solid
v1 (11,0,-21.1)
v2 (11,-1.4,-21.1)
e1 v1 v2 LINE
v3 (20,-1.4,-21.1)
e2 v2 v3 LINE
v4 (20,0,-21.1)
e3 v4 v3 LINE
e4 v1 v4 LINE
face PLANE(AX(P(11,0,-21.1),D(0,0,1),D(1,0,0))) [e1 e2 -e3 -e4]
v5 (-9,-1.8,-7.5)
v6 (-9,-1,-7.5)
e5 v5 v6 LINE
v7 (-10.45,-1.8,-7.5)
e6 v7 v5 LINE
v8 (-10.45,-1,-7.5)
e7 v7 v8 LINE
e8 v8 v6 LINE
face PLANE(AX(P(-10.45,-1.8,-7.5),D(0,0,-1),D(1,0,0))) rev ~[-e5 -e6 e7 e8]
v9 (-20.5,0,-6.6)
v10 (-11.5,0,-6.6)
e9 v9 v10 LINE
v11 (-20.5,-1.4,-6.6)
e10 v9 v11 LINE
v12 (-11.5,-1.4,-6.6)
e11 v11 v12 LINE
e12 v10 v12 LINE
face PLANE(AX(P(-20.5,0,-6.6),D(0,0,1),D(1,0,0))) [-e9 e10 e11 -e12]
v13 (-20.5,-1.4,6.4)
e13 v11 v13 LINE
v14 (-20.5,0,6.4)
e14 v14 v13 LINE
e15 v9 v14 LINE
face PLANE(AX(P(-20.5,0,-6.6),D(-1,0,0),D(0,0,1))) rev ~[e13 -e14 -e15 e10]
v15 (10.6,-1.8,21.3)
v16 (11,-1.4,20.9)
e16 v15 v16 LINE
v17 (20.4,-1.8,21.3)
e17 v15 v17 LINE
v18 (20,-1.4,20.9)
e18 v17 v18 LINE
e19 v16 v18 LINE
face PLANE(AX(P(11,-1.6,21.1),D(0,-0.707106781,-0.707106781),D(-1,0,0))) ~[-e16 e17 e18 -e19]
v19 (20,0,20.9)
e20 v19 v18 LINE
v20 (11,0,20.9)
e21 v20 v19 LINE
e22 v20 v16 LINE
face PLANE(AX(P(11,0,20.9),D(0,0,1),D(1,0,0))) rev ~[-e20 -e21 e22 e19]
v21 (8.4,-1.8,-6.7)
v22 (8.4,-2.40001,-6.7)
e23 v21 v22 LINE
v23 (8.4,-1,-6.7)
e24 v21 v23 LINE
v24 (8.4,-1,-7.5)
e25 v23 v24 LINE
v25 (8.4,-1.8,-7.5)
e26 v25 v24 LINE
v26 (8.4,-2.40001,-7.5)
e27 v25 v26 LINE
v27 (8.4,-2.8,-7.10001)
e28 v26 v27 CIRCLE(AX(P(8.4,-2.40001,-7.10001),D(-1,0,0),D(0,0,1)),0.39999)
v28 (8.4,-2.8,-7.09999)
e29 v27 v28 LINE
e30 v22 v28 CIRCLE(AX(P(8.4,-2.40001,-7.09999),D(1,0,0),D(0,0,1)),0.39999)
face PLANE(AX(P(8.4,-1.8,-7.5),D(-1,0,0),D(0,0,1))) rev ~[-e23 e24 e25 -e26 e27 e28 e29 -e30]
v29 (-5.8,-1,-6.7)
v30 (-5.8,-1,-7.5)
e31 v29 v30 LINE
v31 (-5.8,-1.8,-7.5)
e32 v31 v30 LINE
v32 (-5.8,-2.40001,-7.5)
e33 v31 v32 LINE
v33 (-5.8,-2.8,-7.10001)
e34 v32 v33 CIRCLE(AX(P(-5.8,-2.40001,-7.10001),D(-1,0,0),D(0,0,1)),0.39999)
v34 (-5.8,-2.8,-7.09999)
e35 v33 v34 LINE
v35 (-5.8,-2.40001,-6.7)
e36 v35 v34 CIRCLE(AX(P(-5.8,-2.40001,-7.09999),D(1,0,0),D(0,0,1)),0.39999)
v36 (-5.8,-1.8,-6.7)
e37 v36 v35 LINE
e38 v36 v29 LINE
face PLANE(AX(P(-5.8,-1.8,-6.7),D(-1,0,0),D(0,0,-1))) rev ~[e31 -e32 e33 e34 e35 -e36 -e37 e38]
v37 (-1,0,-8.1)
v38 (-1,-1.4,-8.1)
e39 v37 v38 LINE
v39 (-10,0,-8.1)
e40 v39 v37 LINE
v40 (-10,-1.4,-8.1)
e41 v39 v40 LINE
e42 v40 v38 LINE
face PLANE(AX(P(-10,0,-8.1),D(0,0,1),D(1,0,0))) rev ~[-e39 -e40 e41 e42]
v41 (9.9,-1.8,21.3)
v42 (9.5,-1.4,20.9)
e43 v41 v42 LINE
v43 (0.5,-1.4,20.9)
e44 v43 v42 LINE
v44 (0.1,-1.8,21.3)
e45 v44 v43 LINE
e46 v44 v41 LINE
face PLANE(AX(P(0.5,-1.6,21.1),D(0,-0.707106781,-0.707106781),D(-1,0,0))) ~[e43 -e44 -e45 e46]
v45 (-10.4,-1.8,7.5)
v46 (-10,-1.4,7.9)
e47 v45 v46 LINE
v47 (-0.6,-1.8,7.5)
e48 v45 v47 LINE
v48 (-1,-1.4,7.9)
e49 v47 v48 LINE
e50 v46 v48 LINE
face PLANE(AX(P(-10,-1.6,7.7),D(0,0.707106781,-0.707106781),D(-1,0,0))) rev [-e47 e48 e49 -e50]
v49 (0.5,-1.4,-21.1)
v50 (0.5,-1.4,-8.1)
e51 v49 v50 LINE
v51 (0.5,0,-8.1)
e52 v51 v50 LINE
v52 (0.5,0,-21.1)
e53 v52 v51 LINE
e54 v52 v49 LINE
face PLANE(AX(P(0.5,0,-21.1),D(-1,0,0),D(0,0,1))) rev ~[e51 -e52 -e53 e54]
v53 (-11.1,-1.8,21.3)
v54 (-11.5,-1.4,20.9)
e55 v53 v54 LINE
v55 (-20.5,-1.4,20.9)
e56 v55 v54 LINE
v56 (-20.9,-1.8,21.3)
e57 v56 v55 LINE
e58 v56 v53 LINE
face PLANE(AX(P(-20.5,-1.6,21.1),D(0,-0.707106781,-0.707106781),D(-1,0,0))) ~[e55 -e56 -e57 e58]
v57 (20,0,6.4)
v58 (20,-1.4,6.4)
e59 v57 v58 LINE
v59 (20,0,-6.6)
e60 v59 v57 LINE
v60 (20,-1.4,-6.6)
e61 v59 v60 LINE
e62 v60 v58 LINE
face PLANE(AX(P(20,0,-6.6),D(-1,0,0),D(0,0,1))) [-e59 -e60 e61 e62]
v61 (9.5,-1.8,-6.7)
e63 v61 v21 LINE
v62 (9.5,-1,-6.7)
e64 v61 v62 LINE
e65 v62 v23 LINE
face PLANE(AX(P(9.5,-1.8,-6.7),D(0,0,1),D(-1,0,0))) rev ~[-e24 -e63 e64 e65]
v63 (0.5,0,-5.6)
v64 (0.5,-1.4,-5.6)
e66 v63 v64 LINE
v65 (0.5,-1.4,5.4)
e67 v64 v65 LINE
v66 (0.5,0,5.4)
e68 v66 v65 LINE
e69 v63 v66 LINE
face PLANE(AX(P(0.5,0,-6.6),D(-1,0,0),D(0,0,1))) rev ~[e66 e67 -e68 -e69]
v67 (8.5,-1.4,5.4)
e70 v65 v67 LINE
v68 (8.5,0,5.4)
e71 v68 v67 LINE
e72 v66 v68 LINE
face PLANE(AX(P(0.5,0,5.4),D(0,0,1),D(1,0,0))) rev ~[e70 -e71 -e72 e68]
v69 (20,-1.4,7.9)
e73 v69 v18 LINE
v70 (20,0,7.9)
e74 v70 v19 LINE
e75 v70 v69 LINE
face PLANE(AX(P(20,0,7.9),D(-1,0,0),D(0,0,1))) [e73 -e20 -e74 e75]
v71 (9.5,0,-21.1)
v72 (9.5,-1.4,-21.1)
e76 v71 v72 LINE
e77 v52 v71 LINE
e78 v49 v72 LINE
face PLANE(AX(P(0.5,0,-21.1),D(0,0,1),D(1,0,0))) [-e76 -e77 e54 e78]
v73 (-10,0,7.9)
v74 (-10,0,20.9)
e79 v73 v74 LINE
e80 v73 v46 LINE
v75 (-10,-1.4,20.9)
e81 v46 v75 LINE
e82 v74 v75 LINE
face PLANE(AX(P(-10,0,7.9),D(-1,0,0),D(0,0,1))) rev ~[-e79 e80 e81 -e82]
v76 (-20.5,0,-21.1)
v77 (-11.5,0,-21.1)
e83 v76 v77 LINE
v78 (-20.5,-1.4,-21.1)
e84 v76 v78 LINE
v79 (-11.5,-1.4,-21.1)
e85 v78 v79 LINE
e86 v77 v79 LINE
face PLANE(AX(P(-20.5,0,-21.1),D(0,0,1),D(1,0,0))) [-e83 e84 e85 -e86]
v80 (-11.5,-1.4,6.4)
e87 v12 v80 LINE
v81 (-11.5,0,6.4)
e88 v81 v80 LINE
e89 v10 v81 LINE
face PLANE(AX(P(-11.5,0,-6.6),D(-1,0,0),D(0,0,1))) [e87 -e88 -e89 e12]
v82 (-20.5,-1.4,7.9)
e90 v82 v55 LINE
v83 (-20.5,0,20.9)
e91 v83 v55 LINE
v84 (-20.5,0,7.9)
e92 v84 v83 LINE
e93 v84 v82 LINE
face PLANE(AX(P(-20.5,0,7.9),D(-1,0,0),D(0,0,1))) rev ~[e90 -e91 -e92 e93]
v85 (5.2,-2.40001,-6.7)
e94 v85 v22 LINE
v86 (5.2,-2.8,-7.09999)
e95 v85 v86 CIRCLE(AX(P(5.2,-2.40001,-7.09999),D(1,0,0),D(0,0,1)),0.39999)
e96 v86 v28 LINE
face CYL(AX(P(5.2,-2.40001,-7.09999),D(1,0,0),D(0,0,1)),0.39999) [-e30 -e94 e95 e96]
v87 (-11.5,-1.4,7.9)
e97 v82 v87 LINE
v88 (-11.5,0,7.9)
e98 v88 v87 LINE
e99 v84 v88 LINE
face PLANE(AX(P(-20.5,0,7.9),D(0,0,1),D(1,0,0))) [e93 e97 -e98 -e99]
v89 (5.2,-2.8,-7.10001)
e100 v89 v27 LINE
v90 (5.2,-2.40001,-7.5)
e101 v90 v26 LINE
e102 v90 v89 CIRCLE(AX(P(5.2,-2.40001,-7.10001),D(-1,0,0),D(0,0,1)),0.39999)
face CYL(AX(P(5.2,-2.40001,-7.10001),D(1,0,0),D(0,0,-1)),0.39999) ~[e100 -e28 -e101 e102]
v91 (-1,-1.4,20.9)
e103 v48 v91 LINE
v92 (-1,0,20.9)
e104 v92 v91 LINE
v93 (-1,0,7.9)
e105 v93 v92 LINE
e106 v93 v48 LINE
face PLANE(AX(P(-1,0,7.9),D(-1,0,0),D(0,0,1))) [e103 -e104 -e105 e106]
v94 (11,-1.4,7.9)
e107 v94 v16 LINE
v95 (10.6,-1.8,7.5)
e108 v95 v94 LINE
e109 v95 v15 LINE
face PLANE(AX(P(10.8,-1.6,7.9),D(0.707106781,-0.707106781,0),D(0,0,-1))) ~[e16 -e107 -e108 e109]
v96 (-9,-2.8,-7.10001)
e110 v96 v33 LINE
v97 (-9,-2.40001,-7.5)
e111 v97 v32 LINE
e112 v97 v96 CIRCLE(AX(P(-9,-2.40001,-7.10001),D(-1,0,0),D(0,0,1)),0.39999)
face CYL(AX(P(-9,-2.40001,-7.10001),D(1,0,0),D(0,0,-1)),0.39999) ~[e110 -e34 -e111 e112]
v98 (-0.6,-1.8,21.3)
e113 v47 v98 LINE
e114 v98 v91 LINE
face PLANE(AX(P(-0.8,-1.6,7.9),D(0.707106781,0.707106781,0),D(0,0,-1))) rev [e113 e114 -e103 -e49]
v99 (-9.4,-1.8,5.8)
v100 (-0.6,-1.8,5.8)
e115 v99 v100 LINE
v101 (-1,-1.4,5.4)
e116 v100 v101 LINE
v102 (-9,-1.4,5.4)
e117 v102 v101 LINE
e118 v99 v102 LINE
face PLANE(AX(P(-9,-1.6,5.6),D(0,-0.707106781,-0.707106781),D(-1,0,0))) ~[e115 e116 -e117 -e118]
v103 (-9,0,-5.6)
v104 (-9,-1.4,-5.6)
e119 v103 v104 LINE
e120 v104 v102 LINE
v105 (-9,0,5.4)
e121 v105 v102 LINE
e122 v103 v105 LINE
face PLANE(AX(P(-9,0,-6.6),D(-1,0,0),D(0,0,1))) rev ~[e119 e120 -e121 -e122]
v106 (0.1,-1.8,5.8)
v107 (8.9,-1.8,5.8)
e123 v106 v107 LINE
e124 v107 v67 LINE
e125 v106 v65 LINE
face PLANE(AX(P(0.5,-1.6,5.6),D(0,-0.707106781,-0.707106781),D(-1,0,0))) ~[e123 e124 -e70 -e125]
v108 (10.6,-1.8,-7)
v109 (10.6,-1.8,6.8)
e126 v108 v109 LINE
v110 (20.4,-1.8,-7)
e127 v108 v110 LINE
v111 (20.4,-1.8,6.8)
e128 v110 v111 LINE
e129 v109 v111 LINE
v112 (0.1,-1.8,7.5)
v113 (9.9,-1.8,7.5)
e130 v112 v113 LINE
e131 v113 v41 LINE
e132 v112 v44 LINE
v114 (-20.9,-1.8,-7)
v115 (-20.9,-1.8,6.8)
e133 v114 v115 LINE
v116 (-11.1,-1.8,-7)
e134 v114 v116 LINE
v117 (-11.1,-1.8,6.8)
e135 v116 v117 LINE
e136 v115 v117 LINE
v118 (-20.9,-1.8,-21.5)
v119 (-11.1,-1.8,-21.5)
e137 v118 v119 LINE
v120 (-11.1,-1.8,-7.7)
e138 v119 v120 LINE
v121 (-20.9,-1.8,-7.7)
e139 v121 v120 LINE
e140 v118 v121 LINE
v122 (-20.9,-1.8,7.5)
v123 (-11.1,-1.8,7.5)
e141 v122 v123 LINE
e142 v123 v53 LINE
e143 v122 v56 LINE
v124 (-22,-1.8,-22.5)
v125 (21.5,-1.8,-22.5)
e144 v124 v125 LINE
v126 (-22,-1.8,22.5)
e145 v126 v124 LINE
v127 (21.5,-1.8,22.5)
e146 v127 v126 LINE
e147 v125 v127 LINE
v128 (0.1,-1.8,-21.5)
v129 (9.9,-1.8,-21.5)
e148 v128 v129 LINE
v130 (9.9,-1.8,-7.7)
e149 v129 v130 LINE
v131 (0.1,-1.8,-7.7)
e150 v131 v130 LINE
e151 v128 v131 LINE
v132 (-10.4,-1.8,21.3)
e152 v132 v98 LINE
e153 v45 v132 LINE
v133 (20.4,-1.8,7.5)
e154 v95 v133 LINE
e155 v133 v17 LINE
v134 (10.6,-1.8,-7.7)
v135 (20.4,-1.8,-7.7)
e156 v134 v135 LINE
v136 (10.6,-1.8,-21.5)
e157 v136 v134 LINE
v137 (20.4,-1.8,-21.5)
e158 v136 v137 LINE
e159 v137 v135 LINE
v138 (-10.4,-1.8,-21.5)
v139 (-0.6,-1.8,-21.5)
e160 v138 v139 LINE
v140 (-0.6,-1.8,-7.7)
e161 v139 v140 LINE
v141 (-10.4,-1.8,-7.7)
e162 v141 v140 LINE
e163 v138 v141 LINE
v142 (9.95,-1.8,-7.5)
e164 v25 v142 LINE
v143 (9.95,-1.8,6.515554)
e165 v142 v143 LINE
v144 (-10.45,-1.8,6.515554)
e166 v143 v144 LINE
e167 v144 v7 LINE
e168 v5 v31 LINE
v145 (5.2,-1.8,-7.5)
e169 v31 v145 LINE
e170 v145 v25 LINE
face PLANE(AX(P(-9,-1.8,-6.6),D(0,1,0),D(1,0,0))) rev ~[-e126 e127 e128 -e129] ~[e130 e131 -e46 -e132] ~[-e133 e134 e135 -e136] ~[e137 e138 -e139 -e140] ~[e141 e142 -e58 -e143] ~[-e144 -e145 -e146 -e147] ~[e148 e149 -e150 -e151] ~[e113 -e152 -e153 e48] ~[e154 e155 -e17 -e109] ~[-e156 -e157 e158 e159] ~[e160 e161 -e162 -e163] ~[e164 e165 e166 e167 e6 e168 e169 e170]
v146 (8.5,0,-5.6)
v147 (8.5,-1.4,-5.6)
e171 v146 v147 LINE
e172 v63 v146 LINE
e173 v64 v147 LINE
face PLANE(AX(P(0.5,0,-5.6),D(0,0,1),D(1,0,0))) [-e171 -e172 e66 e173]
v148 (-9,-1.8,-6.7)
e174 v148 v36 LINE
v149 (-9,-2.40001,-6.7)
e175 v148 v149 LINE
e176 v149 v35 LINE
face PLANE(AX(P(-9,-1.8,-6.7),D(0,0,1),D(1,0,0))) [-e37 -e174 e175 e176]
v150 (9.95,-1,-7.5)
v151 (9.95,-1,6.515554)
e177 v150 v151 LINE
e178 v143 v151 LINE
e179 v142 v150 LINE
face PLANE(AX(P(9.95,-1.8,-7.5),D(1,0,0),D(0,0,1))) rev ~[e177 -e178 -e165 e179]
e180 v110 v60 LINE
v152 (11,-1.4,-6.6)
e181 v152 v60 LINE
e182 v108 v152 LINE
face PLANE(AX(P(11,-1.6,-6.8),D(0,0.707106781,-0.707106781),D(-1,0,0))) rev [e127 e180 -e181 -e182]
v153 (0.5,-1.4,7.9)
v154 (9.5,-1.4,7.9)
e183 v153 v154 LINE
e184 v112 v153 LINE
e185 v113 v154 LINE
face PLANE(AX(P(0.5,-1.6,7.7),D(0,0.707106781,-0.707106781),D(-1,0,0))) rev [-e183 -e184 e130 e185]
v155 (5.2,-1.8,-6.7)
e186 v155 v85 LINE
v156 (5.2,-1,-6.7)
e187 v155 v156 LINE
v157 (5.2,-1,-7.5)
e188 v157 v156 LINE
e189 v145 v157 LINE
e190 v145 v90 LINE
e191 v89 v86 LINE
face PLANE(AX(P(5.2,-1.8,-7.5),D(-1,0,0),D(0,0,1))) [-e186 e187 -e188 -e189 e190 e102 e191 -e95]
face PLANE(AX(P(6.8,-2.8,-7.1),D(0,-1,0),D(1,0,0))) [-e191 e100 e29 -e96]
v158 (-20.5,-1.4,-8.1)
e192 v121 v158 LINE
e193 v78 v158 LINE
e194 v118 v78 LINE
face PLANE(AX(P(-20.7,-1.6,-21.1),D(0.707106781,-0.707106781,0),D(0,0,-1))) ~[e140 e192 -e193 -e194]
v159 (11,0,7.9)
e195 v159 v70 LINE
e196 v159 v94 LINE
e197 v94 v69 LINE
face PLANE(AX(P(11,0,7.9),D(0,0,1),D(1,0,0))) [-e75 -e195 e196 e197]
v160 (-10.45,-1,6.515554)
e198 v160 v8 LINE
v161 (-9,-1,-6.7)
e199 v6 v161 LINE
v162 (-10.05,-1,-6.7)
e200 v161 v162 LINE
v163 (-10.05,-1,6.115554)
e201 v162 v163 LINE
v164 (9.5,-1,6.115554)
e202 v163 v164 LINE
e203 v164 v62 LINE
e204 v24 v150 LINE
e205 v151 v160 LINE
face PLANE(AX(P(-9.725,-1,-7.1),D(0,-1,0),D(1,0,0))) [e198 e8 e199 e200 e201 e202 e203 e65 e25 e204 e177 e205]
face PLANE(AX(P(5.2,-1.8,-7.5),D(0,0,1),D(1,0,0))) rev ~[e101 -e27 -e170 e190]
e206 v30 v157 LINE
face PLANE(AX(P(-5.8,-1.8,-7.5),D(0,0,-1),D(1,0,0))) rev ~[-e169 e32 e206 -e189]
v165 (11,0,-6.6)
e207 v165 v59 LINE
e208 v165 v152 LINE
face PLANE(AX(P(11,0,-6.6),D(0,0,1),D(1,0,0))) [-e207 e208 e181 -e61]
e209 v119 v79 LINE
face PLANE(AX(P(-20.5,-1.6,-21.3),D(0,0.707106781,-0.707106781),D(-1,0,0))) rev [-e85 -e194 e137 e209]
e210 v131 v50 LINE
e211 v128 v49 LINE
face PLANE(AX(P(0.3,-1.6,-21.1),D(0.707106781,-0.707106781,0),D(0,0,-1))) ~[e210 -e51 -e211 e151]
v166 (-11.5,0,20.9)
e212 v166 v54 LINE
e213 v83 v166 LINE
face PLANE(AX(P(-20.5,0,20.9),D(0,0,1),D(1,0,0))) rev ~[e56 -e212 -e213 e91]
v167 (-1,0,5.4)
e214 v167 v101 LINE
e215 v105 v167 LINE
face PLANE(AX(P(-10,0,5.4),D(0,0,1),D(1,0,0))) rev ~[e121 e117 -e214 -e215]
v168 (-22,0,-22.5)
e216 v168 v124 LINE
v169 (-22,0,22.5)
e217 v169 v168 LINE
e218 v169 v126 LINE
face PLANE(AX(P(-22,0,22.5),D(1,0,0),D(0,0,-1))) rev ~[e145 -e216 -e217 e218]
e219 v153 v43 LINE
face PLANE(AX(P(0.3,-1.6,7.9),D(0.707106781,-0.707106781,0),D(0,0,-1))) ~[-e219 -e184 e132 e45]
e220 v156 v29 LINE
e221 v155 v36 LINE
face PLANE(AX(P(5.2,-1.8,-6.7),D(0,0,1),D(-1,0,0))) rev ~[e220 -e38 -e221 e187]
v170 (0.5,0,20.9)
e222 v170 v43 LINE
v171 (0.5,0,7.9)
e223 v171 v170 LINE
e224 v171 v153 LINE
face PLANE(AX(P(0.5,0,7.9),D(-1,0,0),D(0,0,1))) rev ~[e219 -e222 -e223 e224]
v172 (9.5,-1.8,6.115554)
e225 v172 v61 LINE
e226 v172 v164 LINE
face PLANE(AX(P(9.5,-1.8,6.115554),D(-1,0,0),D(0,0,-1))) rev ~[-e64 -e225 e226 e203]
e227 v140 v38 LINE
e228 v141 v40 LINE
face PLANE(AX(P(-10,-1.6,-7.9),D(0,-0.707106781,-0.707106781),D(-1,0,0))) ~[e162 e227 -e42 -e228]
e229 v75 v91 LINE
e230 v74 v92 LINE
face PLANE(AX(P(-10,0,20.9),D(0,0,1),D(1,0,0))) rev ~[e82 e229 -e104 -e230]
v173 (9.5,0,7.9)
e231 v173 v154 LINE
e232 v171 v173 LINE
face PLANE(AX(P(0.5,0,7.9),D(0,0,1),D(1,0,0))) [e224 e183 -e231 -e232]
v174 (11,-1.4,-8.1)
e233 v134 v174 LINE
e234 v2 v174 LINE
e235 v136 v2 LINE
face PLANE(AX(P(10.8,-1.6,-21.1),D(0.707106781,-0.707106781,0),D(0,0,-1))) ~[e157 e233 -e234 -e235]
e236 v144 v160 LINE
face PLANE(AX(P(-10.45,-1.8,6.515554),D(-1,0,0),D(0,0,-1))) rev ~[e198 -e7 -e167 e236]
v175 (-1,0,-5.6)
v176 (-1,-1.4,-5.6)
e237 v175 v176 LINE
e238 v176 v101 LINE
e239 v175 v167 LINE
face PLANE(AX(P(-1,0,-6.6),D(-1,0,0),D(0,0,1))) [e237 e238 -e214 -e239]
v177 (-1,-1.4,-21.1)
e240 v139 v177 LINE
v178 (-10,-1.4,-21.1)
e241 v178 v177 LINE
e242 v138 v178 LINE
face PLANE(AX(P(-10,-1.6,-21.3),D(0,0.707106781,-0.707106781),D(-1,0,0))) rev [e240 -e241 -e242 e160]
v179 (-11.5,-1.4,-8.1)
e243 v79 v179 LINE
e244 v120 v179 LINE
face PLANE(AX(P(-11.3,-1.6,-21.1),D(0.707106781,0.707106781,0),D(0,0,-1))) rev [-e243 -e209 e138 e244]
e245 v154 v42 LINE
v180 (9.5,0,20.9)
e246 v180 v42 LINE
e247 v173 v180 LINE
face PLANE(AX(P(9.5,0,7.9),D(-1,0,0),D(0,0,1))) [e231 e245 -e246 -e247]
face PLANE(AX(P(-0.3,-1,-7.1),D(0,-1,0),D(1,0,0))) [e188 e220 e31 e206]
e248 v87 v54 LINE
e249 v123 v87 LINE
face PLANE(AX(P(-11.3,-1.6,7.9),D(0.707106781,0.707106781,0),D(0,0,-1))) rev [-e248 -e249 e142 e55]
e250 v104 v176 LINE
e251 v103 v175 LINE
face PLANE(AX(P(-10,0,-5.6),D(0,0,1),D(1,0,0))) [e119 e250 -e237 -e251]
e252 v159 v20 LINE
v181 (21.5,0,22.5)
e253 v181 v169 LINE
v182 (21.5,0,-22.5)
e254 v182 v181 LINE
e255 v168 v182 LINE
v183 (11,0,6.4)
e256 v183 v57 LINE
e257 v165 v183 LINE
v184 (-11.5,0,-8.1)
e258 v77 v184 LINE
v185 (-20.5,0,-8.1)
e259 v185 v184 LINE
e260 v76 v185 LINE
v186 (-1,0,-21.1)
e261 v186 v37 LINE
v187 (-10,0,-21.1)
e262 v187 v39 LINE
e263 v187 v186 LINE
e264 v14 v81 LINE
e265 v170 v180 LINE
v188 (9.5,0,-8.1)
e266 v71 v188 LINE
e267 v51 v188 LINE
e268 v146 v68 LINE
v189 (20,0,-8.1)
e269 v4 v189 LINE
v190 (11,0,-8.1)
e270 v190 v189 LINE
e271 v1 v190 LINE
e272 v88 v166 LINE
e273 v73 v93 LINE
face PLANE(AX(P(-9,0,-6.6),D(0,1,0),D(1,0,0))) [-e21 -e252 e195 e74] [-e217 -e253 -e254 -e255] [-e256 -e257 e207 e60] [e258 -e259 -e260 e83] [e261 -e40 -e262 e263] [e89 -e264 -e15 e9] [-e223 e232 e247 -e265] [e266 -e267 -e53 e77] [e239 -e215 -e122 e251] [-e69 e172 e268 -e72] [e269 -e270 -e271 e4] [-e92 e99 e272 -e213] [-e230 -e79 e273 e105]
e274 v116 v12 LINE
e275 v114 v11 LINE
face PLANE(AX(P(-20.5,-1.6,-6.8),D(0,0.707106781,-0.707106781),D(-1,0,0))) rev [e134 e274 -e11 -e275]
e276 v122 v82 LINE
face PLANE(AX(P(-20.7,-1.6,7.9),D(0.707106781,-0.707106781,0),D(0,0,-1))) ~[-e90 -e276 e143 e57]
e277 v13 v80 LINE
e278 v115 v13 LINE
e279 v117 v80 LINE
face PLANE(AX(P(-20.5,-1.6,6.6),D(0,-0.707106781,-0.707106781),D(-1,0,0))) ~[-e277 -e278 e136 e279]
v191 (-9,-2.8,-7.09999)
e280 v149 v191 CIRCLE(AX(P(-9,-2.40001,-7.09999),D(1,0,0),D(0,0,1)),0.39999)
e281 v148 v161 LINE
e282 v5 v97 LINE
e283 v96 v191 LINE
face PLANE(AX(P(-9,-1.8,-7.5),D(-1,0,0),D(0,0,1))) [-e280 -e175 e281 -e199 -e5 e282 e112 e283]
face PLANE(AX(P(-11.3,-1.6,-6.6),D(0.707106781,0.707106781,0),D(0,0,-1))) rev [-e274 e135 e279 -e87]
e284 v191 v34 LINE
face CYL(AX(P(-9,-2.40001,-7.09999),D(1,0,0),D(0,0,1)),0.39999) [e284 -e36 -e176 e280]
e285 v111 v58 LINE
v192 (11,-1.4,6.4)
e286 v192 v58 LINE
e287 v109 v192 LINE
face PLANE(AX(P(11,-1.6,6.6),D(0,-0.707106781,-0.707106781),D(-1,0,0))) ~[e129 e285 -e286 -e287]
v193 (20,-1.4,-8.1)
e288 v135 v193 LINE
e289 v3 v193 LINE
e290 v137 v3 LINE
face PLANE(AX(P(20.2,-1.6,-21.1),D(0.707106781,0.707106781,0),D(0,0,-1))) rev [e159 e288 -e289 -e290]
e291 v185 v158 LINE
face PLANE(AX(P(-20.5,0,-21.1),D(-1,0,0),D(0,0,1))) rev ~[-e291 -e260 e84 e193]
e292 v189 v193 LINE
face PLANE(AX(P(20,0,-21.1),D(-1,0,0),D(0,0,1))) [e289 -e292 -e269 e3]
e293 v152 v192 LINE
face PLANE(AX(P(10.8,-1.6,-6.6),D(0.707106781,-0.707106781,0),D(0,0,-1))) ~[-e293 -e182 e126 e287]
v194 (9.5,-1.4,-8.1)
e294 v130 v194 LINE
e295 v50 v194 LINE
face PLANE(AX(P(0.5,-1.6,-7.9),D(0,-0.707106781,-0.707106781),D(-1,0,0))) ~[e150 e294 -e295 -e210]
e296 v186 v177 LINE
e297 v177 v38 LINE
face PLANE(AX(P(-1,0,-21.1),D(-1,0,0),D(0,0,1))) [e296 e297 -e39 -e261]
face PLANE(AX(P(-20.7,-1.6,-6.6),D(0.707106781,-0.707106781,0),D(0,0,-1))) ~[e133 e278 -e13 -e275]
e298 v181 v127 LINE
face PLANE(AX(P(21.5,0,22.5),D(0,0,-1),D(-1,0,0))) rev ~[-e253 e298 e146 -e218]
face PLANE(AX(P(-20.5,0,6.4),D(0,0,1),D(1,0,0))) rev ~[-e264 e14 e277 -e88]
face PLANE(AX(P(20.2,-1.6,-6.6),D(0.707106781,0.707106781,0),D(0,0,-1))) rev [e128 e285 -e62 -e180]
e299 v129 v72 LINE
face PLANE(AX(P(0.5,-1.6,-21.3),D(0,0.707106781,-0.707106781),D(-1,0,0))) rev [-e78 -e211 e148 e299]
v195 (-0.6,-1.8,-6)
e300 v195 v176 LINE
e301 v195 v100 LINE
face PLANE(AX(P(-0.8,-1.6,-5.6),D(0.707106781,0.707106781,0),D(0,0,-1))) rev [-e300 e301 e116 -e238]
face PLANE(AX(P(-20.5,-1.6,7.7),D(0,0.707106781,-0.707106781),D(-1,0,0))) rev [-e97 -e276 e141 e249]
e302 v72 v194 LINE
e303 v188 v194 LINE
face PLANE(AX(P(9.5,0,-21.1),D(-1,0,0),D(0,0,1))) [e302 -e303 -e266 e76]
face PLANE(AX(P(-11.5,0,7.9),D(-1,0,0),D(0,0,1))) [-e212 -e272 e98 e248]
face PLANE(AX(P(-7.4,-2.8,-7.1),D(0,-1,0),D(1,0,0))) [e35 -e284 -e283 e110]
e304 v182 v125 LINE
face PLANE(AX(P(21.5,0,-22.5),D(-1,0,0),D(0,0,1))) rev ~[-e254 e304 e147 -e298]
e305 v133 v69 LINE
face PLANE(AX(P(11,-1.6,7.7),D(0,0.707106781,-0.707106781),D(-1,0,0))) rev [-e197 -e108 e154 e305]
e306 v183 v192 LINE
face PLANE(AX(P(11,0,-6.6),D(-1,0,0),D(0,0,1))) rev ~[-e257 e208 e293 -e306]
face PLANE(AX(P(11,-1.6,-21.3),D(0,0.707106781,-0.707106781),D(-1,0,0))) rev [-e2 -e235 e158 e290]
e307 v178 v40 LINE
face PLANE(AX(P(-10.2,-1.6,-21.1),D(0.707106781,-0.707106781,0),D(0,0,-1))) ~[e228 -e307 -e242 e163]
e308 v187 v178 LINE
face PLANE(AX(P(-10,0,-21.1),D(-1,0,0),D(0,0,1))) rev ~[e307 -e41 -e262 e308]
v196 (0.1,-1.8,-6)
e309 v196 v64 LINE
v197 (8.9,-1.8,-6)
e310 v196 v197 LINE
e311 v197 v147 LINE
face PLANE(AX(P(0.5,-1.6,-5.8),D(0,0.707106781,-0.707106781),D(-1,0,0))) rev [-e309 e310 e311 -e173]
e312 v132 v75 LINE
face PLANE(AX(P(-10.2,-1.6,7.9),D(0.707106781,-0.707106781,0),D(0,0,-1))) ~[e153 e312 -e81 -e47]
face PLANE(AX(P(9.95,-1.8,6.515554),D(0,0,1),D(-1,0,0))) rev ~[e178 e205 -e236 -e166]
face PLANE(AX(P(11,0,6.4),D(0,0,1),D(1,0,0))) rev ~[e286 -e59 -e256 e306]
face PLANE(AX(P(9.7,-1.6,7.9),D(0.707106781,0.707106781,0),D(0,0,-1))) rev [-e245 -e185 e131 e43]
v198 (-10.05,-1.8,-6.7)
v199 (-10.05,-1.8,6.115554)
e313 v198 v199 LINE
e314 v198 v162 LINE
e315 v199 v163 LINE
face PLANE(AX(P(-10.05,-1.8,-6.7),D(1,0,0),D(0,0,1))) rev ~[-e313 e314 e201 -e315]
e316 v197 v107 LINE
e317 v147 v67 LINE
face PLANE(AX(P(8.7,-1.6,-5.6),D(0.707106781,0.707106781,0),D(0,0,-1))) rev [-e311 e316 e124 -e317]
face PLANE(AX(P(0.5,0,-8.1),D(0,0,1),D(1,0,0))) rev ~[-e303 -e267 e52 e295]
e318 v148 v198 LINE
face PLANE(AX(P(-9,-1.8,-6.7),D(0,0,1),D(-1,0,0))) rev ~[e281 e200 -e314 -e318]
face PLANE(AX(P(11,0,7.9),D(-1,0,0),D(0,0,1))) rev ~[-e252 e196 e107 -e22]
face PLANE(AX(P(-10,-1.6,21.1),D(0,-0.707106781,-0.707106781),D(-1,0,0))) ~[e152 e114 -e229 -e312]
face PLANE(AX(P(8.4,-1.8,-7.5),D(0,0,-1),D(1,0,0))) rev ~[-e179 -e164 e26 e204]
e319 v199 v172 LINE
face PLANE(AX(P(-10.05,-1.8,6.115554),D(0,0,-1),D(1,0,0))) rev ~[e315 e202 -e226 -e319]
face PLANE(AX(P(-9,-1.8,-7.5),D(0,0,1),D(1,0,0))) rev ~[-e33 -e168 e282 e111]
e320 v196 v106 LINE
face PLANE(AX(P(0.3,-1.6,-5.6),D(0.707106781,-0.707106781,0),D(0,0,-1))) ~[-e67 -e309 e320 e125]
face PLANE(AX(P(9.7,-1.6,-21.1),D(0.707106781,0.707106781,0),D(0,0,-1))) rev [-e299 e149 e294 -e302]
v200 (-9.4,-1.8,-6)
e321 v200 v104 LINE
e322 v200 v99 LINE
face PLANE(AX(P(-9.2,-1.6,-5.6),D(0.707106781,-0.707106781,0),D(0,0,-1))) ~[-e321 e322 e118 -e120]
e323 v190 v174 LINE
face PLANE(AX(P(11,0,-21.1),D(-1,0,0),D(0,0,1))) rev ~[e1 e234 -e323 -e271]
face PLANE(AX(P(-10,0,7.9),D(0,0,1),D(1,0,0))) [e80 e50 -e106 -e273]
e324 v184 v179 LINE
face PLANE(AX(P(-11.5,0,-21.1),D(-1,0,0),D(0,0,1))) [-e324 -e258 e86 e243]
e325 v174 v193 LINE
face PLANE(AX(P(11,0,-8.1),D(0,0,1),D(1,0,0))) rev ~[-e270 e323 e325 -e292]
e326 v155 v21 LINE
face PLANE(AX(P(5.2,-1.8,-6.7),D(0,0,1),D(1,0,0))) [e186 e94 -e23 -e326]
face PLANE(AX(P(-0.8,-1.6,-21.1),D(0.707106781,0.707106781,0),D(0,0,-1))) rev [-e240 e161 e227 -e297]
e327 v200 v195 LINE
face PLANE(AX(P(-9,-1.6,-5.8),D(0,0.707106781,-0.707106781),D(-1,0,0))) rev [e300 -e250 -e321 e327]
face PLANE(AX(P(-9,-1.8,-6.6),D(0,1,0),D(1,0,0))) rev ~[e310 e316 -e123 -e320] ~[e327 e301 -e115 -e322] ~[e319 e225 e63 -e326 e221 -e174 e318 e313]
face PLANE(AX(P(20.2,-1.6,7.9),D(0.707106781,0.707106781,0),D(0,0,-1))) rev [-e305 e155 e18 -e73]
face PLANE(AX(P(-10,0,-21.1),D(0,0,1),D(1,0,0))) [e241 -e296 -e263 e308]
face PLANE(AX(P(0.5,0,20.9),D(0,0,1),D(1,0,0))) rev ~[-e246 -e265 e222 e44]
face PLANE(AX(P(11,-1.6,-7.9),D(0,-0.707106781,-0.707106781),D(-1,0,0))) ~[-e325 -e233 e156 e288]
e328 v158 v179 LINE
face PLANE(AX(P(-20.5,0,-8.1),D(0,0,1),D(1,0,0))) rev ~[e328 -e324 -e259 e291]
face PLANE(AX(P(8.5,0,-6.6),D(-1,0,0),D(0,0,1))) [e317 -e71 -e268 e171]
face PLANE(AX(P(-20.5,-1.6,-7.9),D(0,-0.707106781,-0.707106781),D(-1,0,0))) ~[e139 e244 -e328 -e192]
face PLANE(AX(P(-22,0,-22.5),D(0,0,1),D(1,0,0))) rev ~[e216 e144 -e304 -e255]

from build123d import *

# Parameters (mm, degrees)
F0_W     = 9
F0_H     = 13
F1_DEPTH = 1.8
F2_DEPTH = 1
F3_DEPTH = 1
F4_DEPTH = 1
F5_DEPTH = 1
F7_DEPTH = 0.8
F8_W     = 3.2
F8_H     = 0.8
F9_DEPTH = 1
F10_R    = 0.39999
F11_SIZE = 0.4


# Not quite as in the source:
# - a fillet or chamfer is up to 0.001 mm smaller than in the source, because OpenCascade refuses the exact size
# - a feature names something its author has since deleted; it is built from what else it names


with BuildPart() as f1:
    # F0 (on Front) → F1 (new body)
    with BuildSketch(Plane.XZ):
        Polygon((-22, -22.5), (21.5, -22.5), (21.5, 22.5), (-22, 22.5), (-22, -7.5), align=None)
        with Locations((-16, -14.6)):
            Rectangle(F0_W, F0_H, mode=Mode.SUBTRACT)
        with Locations((-5.5, -14.6)):
            Rectangle(F0_W, F0_H, mode=Mode.SUBTRACT)
        with Locations((-16, -0.1)):
            Rectangle(F0_W, F0_H, mode=Mode.SUBTRACT)
        with Locations((-5.5, -0.1)):
            Rectangle(F0_W, F0_H, mode=Mode.SUBTRACT)
        with Locations((5, -14.6)):
            Rectangle(F0_W, F0_H, mode=Mode.SUBTRACT)
        with Locations((15.5, -14.6)):
            Rectangle(F0_W, F0_H, mode=Mode.SUBTRACT)
        with Locations((5, -0.1)):
            Rectangle(F0_W, F0_H, mode=Mode.SUBTRACT)
        with Locations((15.5, -0.1)):
            Rectangle(F0_W, F0_H, mode=Mode.SUBTRACT)
        with Locations((-16, 14.4)):
            Rectangle(F0_W, F0_H, mode=Mode.SUBTRACT)
        with Locations((-5.5, 14.4)):
            Rectangle(F0_W, F0_H, mode=Mode.SUBTRACT)
        with Locations((5, 14.4)):
            Rectangle(F0_W, F0_H, mode=Mode.SUBTRACT)
        with Locations((15.5, 14.4)):
            Rectangle(F0_W, F0_H, mode=Mode.SUBTRACT)
    extrude(amount=F1_DEPTH)

    # F2 (add): a face of the model
    f2_faces = [f1.faces().sort_by_distance(p)[0] for p in [
        (9.5, -0.9, -0.1),
    ]]
    extrude(f2_faces, amount=F2_DEPTH)

    # F3 (add): a face of the model
    f3_faces = [f1.faces().sort_by_distance(p)[0] for p in [
        (-10, -0.9, -0.1),
    ]]
    extrude(f3_faces, amount=F3_DEPTH)

    # F4 (add): faces of the model
    f4_faces = [f1.faces().sort_by_distance(p)[0] for p in [
        (-5, -0.9, 6.4),
        (4.5, -0.9, 6.4),
    ]]
    extrude(f4_faces, amount=F4_DEPTH)

    # F5 (add): faces of the model
    f5_faces = [f1.faces().sort_by_distance(p)[0] for p in [
        (-5, -0.9, -6.6),
        (4.5, -0.9, -6.6),
    ]]
    extrude(f5_faces, amount=F5_DEPTH)

    # F6 (on face) → F7 (cut)
    with BuildSketch(Plane.XZ.offset(1.8)):
        Polygon((5.2, -7.5), (5.2, -6.7), (-5.8, -6.7), (-5.8, -7.5), (-0.25, -7.5), align=None)
        Polygon((-9, -6.7), (-10.05, -6.7), (-10.45, -6.7), (-10.45, -7.5), (-9, -7.5), align=None)
        Polygon((9.5, 6.1155543663), (9.5, -6.7), (8.4, -6.7), (8.4, -7.5), (9.95, -7.5), (9.95, 6.5155543663), (-10.45, 6.5155543663), (-10.45, -6.7), (-10.05, -6.7), (-10.05, 6.1155543663), align=None)
    extrude(amount=-F7_DEPTH, mode=Mode.SUBTRACT)

    # F8 (on face) → F9 (join)
    with BuildSketch(Plane.XZ.offset(1.8)):
        with Locations((6.8, -7.1)):
            Rectangle(F8_W, F8_H)
        with Locations((-7.4, -7.1)):
            Rectangle(F8_W, F8_H)
    extrude(amount=F9_DEPTH)

    # F10 (radius 0.4 in the source; OpenCascade refuses exactly that, so slightly less here)
    f10_edges = [f1.edges().sort_by_distance(p)[0] for p in [
        (6.8, -2.8, -6.7),
        (6.8, -2.8, -7.5),
        (-7.4, -2.8, -7.5),
        (-7.4, -2.8, -6.7),
    ]]
    fillet(f10_edges, radius=F10_R)

    # F11
    f11_edges = [f1.edges().sort_by_distance(p)[0] for p in [
        (-20.5, -1.8, 14.4),
        (-11.5, -1.8, 14.4),
        (-16, -1.8, 20.9),
        (-16, -1.8, 7.9),
        (-16, -1.8, 6.4),
        (-20.5, -1.8, -0.1),
        (-16, -1.8, -6.6),
        (-11.5, -1.8, -0.1),
        (-5.5, -1.8, 7.9),
        (-10, -1.8, 14.4),
        (-1, -1.8, 14.4),
        (0.5, -1.8, 14.4),
        (5, -1.8, 7.9),
        (9.5, -1.8, 14.4),
        (-5, -1.8, 5.4),
        (-9, -1.8, -0.1),
        (-1, -1.8, -0.1),
        (0.5, -1.8, -0.1),
        (4.5, -1.8, 5.4),
        (8.5, -1.8, -0.1),
        (4.5, -1.8, -5.6),
        (-5, -1.8, -5.6),
        (-5.5, -1.8, 20.9),
        (5, -1.8, 20.9),
        (15.5, -1.8, 20.9),
        (20, -1.8, 14.4),
        (15.5, -1.8, 7.9),
        (11, -1.8, 14.4),
        (15.5, -1.8, 6.4),
        (11, -1.8, -0.1),
        (20, -1.8, -0.1),
        (15.5, -1.8, -6.6),
        (15.5, -1.8, -8.1),
        (11, -1.8, -14.6),
        (15.5, -1.8, -21.1),
        (20, -1.8, -14.6),
        (9.5, -1.8, -14.6),
        (5, -1.8, -8.1),
        (0.5, -1.8, -14.6),
        (5, -1.8, -21.1),
        (-5.5, -1.8, -21.1),
        (-1, -1.8, -14.6),
        (-5.5, -1.8, -8.1),
        (-10, -1.8, -14.6),
        (-11.5, -1.8, -14.6),
        (-16, -1.8, -8.1),
        (-20.5, -1.8, -14.6),
        (-16, -1.8, -21.1),
    ]]
    chamfer(f11_edges, length=F11_SIZE)


solid = f1.part
